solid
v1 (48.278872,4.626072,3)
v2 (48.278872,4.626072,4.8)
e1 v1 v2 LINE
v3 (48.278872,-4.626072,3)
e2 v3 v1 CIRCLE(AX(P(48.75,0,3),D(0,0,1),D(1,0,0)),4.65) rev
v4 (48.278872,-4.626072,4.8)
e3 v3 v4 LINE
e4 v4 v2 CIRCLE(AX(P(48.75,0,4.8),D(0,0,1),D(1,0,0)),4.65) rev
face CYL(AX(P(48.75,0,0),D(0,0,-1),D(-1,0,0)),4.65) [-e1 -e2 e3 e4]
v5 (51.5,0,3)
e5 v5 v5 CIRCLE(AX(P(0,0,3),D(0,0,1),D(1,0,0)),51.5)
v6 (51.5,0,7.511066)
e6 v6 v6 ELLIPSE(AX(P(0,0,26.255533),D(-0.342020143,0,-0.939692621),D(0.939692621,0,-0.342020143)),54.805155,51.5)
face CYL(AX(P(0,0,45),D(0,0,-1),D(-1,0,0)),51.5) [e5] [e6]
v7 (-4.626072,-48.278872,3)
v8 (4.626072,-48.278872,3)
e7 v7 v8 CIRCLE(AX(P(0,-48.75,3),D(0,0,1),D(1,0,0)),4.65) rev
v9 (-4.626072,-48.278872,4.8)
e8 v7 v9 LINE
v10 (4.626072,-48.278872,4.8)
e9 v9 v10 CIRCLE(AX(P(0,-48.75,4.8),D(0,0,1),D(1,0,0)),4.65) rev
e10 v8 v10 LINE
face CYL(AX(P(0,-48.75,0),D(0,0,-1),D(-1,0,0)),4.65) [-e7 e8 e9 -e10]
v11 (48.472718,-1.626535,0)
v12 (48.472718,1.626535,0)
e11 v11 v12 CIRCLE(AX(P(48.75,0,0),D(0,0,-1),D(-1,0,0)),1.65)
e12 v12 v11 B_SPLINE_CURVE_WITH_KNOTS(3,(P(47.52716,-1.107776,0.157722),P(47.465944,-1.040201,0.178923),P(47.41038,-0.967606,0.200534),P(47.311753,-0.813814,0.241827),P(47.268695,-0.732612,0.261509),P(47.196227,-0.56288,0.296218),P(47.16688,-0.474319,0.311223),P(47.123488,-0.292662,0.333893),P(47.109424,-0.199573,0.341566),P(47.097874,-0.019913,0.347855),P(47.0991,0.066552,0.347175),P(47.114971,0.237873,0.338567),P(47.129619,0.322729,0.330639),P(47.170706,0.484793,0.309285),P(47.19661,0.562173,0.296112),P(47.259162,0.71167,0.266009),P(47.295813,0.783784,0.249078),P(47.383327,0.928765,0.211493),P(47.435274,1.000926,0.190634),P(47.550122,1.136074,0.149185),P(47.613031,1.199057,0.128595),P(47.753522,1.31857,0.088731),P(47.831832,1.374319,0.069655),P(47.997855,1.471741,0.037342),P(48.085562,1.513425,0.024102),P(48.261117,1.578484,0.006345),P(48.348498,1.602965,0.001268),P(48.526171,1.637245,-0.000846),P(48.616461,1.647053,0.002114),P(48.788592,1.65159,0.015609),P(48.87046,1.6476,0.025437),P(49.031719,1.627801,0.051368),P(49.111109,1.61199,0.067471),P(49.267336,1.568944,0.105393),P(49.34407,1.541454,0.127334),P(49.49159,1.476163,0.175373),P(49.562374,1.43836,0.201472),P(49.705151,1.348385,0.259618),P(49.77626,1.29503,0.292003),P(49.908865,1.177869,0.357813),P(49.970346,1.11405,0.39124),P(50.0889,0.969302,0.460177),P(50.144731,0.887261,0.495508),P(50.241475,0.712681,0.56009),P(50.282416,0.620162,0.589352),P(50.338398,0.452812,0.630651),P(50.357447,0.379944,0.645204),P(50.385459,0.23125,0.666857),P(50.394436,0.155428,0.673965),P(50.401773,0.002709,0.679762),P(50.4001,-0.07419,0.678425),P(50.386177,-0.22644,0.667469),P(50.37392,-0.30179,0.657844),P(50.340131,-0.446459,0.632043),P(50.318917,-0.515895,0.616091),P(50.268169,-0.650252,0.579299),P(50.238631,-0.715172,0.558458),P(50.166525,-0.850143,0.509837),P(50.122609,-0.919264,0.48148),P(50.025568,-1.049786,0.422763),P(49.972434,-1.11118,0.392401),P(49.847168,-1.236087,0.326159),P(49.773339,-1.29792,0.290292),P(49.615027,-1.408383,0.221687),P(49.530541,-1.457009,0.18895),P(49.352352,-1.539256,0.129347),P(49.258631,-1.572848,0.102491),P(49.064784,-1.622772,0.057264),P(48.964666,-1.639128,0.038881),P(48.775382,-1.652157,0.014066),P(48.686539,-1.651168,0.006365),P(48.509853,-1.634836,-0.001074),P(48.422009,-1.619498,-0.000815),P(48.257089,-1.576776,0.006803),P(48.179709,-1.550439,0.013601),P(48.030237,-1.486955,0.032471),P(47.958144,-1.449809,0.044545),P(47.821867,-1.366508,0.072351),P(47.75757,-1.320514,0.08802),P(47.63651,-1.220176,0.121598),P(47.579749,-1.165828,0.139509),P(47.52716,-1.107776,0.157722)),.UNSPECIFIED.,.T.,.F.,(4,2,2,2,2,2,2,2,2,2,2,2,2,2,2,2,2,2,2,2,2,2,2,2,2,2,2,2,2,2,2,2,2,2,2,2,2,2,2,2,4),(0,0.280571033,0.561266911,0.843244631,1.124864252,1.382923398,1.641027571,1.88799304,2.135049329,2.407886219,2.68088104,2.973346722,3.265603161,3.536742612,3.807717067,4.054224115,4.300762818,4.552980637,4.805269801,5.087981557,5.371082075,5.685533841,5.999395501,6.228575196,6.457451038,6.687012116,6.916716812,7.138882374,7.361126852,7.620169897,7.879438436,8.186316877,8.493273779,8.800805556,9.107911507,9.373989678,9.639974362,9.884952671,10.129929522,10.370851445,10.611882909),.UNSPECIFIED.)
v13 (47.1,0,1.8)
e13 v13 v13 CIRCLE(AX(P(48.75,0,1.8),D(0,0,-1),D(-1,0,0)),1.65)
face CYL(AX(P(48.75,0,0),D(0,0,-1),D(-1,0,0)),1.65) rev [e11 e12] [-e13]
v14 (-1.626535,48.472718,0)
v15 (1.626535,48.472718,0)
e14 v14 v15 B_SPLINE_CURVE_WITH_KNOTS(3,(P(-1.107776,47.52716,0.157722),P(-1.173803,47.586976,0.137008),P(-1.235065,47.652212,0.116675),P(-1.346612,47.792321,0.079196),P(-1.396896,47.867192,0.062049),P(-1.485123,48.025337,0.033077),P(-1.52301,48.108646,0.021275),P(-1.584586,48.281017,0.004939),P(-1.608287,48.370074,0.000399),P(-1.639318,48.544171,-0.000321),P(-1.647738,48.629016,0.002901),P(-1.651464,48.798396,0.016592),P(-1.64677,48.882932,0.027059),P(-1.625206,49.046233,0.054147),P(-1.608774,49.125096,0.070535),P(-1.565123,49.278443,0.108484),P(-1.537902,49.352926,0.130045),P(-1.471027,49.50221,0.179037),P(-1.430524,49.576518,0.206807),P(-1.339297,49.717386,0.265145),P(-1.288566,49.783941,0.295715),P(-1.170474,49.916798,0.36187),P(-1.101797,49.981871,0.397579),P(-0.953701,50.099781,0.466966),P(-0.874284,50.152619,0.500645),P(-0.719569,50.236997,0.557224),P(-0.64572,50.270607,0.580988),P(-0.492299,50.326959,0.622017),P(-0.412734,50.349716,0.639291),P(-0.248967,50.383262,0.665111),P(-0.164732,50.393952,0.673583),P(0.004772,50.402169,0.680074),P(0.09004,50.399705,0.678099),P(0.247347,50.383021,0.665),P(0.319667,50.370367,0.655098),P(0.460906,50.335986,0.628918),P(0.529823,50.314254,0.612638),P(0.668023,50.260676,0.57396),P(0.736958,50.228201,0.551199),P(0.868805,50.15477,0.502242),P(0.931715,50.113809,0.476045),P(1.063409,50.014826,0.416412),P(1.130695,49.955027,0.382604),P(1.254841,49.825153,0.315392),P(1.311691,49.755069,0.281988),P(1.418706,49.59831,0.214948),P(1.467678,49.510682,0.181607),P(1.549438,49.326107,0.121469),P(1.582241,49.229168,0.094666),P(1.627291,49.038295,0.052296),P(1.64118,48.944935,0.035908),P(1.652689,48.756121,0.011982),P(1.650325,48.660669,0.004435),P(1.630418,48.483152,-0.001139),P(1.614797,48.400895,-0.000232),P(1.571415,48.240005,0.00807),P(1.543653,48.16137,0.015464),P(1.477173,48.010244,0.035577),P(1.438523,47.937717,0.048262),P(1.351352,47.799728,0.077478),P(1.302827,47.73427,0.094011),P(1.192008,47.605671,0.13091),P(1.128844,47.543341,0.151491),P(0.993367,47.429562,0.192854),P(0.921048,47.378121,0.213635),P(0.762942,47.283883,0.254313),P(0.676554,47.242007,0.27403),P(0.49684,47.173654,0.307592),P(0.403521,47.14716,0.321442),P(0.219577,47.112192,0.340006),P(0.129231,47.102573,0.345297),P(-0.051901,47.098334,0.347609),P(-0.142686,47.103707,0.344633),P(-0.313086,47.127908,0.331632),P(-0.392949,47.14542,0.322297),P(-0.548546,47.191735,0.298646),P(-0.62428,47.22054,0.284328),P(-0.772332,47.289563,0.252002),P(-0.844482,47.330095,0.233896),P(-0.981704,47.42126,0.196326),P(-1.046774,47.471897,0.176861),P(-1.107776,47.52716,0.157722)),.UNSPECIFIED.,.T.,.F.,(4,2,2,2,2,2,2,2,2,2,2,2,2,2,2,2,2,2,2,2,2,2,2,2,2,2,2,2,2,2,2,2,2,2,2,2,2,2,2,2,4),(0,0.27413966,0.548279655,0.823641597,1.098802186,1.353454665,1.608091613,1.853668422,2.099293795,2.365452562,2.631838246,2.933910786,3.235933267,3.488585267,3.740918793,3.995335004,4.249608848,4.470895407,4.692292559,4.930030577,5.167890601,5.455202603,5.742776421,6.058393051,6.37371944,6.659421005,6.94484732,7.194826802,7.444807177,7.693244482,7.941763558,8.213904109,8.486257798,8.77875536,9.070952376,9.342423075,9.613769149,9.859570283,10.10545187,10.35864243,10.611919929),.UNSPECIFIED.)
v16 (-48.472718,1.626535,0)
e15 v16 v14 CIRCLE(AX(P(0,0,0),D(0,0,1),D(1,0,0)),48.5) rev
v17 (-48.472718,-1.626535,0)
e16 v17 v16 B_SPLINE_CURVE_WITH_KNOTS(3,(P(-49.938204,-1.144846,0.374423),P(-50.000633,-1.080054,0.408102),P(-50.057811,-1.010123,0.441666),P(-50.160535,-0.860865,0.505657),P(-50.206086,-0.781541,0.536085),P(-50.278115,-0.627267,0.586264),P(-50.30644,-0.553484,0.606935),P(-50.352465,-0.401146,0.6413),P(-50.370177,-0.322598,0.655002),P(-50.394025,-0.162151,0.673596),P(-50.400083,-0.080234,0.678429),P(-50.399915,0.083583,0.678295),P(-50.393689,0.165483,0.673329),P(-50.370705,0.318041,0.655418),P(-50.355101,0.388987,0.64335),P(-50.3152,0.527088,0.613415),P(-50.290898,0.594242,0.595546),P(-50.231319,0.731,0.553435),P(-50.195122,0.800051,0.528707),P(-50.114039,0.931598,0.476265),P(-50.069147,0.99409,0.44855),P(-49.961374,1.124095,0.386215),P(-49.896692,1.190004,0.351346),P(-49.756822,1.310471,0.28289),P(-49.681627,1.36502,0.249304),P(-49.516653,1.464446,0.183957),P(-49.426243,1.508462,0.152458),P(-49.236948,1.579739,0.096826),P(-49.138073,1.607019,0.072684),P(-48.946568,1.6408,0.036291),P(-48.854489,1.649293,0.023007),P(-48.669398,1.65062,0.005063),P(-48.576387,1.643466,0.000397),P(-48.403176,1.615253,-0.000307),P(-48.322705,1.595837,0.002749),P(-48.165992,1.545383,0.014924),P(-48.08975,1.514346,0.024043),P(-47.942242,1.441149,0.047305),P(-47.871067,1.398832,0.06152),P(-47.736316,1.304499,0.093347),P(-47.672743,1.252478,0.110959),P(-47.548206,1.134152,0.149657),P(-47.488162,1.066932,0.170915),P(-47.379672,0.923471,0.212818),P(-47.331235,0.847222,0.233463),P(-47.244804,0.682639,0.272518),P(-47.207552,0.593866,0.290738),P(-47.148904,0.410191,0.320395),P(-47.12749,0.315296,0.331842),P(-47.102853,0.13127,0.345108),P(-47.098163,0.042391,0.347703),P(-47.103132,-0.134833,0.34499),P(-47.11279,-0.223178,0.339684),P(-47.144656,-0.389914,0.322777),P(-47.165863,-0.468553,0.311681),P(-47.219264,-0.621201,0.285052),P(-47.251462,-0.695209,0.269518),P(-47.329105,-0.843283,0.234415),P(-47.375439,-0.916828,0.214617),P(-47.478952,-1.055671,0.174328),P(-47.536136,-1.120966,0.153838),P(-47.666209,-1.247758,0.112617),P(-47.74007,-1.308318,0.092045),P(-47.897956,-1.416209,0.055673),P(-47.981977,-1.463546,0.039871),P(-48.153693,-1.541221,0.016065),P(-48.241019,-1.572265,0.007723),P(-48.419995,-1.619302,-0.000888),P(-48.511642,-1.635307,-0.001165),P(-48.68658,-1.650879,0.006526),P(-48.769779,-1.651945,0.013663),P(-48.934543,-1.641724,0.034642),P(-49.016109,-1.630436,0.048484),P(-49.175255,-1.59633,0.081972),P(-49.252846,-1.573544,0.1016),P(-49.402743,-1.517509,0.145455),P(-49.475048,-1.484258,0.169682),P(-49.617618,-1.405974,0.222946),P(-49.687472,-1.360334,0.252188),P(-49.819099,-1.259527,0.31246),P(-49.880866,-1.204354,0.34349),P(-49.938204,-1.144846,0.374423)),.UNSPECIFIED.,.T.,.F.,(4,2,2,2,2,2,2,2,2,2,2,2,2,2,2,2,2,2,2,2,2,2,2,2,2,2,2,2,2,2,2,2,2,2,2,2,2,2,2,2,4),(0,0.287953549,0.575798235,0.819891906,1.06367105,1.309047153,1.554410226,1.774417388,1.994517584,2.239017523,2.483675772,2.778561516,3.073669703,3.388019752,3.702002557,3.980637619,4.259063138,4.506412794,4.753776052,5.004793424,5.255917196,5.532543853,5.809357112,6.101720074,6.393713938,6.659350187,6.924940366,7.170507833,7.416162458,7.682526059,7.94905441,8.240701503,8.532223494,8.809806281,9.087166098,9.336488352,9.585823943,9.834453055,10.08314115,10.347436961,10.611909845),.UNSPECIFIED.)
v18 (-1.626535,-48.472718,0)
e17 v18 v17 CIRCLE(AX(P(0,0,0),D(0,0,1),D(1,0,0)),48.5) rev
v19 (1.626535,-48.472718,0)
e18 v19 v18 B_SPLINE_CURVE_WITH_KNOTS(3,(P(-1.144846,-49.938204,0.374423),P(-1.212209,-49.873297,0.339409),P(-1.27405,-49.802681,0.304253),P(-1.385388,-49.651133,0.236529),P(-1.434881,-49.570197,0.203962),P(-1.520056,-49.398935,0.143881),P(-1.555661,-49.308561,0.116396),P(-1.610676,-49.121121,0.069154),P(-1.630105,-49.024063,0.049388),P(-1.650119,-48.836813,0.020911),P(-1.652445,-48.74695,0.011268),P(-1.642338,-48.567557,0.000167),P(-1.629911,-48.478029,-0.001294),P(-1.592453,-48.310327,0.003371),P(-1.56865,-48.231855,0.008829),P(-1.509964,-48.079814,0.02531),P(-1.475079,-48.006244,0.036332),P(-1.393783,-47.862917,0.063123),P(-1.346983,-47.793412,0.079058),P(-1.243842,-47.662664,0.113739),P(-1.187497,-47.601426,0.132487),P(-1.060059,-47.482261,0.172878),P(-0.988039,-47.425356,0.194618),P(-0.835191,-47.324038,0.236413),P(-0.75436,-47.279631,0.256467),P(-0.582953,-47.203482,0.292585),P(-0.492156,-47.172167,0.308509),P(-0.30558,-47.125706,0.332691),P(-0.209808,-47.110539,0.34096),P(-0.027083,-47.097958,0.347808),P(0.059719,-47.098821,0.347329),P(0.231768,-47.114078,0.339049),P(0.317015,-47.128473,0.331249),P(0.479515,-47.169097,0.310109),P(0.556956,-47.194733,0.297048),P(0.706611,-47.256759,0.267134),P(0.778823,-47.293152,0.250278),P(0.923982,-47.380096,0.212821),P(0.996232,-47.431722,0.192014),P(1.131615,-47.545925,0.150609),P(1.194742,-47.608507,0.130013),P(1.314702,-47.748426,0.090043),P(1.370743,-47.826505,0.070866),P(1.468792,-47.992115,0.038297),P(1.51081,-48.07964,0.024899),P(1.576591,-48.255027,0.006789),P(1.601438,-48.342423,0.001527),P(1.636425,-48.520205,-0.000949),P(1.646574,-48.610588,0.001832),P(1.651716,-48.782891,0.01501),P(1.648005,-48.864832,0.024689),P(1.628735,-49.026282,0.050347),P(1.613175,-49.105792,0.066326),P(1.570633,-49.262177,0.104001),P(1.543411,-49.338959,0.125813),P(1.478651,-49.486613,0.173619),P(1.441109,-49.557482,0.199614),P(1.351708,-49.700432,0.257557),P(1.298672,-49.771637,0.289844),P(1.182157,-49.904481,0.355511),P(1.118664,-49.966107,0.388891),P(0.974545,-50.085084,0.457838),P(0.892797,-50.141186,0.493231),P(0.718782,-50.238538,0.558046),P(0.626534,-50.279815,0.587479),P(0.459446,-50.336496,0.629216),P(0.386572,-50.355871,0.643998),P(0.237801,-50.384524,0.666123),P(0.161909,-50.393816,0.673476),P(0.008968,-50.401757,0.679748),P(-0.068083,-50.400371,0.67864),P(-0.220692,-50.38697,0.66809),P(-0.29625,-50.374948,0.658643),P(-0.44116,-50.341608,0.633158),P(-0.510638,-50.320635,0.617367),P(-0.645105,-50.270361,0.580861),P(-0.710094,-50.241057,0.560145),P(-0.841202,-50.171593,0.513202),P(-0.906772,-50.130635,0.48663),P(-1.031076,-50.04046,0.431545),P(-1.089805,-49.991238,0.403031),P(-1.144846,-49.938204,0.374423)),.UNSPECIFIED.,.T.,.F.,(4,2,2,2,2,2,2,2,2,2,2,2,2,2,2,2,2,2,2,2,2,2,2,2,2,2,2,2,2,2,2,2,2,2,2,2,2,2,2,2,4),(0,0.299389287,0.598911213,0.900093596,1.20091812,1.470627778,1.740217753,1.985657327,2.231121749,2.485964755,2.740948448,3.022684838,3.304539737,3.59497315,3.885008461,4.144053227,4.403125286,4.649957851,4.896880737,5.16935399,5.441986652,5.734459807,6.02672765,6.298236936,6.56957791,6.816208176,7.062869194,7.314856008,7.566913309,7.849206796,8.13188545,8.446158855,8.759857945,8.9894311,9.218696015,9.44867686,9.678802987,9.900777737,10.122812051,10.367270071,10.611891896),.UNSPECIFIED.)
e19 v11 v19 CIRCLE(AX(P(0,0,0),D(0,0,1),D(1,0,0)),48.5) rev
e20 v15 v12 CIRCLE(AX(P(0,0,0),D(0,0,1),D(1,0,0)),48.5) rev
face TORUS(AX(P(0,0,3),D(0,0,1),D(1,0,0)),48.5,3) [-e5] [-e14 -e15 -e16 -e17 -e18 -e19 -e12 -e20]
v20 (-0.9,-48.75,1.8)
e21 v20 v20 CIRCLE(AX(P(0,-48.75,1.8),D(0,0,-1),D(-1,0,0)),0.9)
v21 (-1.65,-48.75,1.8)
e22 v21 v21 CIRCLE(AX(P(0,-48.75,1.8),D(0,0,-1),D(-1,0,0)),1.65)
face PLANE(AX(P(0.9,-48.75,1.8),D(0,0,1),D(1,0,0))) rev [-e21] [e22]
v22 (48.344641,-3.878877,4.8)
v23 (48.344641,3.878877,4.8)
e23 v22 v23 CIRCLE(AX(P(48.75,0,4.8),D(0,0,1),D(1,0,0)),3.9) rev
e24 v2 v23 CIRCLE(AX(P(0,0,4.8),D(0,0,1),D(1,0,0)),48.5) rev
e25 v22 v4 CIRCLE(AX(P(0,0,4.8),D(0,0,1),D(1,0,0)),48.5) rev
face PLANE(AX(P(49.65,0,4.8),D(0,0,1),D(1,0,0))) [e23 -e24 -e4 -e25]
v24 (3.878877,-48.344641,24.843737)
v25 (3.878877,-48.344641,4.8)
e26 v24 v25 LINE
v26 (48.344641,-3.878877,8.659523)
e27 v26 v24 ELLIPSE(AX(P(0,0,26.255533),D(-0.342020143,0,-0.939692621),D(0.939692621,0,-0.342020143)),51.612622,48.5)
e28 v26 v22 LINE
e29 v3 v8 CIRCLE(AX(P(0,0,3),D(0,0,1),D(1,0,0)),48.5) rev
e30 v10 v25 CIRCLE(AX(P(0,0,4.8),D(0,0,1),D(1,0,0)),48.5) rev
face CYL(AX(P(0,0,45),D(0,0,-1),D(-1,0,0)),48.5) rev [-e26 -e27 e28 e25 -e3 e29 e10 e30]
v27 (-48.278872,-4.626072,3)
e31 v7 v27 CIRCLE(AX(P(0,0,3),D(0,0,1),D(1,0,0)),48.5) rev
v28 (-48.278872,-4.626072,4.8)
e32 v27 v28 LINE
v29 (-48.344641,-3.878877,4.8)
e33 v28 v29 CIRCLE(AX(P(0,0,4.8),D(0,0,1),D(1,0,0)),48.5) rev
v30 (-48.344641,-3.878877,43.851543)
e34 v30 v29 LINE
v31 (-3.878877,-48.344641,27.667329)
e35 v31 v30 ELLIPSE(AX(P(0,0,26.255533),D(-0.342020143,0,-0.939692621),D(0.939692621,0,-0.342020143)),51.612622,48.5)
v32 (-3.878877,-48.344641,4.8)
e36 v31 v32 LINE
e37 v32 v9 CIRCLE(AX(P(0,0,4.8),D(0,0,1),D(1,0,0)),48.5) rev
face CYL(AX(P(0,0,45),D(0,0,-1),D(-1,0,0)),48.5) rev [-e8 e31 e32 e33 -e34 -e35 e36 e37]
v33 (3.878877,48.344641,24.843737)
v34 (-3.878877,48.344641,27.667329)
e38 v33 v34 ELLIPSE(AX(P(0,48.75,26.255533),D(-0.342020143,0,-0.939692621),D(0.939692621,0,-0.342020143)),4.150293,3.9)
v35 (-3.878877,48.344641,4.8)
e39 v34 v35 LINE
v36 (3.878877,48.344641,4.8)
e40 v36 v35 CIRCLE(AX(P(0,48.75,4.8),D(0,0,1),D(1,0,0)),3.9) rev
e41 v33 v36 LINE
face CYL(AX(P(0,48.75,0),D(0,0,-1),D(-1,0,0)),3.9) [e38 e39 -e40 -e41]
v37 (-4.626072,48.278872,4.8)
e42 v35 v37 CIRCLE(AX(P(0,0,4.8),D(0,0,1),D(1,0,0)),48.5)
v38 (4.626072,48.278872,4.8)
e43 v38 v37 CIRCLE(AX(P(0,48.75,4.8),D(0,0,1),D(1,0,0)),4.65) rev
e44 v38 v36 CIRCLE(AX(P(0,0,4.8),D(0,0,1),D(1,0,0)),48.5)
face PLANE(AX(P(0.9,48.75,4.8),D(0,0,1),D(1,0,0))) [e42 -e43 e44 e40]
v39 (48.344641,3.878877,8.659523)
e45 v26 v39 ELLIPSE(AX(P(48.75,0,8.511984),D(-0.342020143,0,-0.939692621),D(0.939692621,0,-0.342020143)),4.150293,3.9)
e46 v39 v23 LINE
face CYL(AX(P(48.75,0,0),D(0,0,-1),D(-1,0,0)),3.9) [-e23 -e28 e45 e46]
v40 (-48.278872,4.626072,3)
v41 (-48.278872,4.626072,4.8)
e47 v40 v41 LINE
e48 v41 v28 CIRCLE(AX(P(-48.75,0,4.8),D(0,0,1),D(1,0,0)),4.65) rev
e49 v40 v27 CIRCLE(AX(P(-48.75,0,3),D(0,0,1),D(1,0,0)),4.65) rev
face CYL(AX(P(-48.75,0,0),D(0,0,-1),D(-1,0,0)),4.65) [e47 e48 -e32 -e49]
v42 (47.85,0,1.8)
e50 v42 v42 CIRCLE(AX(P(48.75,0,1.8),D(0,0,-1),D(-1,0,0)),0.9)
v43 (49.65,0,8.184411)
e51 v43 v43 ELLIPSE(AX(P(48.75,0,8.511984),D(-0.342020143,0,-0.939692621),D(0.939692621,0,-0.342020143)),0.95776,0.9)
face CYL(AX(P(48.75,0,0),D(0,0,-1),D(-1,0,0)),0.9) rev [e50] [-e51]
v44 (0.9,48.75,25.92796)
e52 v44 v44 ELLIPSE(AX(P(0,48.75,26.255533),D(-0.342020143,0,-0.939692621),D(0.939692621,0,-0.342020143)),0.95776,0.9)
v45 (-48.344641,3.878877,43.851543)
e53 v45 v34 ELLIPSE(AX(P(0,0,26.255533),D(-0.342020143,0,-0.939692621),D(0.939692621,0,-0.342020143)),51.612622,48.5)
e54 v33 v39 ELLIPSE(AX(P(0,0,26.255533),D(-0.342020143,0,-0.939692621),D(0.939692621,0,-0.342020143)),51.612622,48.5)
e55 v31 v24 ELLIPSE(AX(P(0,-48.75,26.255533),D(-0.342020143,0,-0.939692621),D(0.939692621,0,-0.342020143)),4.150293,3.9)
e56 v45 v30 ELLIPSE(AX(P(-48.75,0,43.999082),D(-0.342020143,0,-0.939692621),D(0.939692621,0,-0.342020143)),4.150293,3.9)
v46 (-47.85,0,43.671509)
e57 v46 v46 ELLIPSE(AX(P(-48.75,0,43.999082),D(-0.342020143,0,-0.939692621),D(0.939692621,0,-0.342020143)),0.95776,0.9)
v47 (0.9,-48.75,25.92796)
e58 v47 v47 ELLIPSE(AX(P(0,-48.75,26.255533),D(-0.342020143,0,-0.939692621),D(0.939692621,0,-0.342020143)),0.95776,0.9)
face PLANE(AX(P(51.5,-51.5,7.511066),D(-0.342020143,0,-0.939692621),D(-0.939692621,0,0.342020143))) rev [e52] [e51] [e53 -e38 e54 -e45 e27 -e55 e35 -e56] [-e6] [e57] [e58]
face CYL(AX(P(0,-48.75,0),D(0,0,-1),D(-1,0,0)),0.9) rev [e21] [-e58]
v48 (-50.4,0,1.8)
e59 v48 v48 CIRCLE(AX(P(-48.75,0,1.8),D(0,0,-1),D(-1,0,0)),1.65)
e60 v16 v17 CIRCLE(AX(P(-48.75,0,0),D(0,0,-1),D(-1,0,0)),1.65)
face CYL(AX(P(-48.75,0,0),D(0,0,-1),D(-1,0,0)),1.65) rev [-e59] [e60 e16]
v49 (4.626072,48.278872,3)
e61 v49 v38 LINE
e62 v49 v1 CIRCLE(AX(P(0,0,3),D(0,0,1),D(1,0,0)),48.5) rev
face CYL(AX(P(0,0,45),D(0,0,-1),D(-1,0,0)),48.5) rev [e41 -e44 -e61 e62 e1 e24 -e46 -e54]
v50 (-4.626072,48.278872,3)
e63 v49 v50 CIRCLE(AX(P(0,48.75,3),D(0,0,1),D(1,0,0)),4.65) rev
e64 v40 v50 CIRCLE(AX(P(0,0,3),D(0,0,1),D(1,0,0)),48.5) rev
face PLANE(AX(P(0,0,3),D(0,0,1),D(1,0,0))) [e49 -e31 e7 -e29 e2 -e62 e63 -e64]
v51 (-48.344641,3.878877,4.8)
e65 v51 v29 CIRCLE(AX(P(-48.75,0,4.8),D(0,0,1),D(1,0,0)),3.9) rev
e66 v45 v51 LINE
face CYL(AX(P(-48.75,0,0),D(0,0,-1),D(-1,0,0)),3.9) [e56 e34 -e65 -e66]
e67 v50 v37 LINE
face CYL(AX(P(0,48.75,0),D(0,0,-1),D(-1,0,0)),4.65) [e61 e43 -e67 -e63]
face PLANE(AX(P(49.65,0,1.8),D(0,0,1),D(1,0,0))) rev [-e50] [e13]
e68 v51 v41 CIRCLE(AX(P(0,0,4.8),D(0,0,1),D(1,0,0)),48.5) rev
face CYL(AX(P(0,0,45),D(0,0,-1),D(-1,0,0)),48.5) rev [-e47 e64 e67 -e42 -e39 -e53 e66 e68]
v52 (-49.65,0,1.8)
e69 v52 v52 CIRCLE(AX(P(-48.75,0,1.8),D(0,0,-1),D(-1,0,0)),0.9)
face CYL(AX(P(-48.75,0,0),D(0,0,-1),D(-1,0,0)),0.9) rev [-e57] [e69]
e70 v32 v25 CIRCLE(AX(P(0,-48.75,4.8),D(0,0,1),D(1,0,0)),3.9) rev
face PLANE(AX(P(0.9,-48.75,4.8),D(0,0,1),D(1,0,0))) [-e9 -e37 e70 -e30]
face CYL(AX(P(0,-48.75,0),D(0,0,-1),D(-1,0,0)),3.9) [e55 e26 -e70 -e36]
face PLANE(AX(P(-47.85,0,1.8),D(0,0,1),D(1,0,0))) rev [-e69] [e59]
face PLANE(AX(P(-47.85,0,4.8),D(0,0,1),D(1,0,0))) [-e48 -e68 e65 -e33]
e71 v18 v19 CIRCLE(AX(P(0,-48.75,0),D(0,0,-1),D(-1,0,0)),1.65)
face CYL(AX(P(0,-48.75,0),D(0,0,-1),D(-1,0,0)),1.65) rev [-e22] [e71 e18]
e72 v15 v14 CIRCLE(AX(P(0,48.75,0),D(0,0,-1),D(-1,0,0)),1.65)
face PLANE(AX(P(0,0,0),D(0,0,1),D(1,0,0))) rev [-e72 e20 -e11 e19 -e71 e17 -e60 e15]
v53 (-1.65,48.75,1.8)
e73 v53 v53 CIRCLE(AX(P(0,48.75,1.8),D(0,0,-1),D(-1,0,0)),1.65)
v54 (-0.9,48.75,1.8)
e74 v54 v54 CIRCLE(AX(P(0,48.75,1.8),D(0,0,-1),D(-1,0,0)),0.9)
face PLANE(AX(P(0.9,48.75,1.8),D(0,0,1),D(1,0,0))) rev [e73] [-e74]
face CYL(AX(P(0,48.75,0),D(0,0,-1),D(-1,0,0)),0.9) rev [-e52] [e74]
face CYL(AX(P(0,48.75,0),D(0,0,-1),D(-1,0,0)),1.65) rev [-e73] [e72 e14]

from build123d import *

# Parameters (mm, degrees)
SKETCH_1_R                = 51.5
EXTRUDE_1_DEPTH           = 45
CUT_EXTRUDE_1_DEPTH       = 86.612499087
CUT_EXTRUDE_1_DEPTH_BACK  = 86.612499087
FILLET_1_R                = 3
HOLE_WIZARD_1_D           = 1.8
HOLE_WIZARD_1_CBORE_D     = 3.3
HOLE_WIZARD_1_CBORE_DEPTH = 1.8
PATTERN_CIRCULAR_1_COUNT  = 4
SHELL_START               = 3
SHELL_5_DEPTH             = 40.851543255
SHELL_START_2             = 4.8
SHELL_5_2_DEPTH           = 39.051543255


# Read off the part's stored shape, not the designer's step: 抽壳5
with BuildPart() as part:
    # 草图1 → 凸台-拉伸1 (new body)
    with BuildSketch(Plane.XY):
        with Locations(Location((0, 0, 0), (0, 0, 180))):
            Circle(SKETCH_1_R)
    extrude(amount=EXTRUDE_1_DEPTH)

    # 草图2 → 切除-拉伸1 (cut, two sides: drawn at the far end of the back side and taken through both)
    with BuildSketch(Plane(origin=(0, 0, 0), x_dir=(1, 0, 0), z_dir=(0, 1, 0)).offset(-CUT_EXTRUDE_1_DEPTH_BACK)):
        Polygon((-51.5, -45), (51.5, -45), (51.5, -7.511065871), align=None)
    extrude(amount=CUT_EXTRUDE_1_DEPTH + CUT_EXTRUDE_1_DEPTH_BACK, mode=Mode.SUBTRACT)

    # 圆角1
    fillet_1_edges = [part.edges().sort_by_distance(p)[0] for p in [
        (51.5, 0, 0),
    ]]
    fillet(fillet_1_edges, radius=FILLET_1_R)

    # 打孔尺寸(%根据)内六角圆柱头螺钉的类型1 (through all)
    with Locations(Plane(origin=(0, 0, 0), x_dir=(-1, 0, 0), z_dir=(0, 0, -1))):
        with Locations((0, 48.75)):
            hole_wizard_1 = CounterBoreHole(HOLE_WIZARD_1_D / 2, HOLE_WIZARD_1_CBORE_D / 2, HOLE_WIZARD_1_CBORE_DEPTH)

    # 阵列(圆周)1: 打孔尺寸(%根据)内六角圆柱头螺钉的类型1 ×4 about axis
    pattern_circular_1_axis = Axis((0, 0, 0), (0, 0, 1))
    for i in range(1, PATTERN_CIRCULAR_1_COUNT):
        add(hole_wizard_1.rotate(pattern_circular_1_axis, i * 360 / PATTERN_CIRCULAR_1_COUNT), mode=Mode.SUBTRACT)

    # 抽壳5 outline → 抽壳5 (cut)
    with BuildSketch(Plane.XY.offset(SHELL_START)):
        with BuildLine():
            ThreePointArc((-48.278871795, -4.626071575), (-34.294678888, -34.294678888), (-4.626071575, -48.278871795))
            ThreePointArc((-4.626071575, -48.278871795), (0, -44.1), (4.626071575, -48.278871795))
            ThreePointArc((4.626071575, -48.278871795), (34.294678888, -34.294678888), (48.278871795, -4.626071575))
            ThreePointArc((48.278871795, -4.626071575), (44.1, 0), (48.278871795, 4.626071575))
            ThreePointArc((48.278871795, 4.626071575), (34.294678888, 34.294678888), (4.626071575, 48.278871795))
            ThreePointArc((4.626071575, 48.278871795), (0, 44.1), (-4.626071575, 48.278871795))
            ThreePointArc((-4.626071575, 48.278871795), (-34.294678888, 34.294678888), (-48.278871795, 4.626071575))
            ThreePointArc((-48.278871795, 4.626071575), (-44.1, 0), (-48.278871795, -4.626071575))
        make_face()
    extrude(amount=SHELL_5_DEPTH, mode=Mode.SUBTRACT)

    # Shell 5 2 outline → Shell 5 2 (cut)
    with BuildSketch(Plane.XY.offset(SHELL_START_2)):
        with BuildLine():
            ThreePointArc((4.626071575, -48.278871795), (0, -44.1), (-4.626071575, -48.278871795))
            ThreePointArc((-4.626071575, -48.278871795), (-4.252601262, -48.313200914), (-3.878876655, -48.344641026))
            ThreePointArc((-3.878876655, -48.344641026), (0, -44.85), (3.878876655, -48.344641026))
            ThreePointArc((3.878876655, -48.344641026), (4.252601262, -48.313200914), (4.626071575, -48.278871795))
        make_face()
        with BuildLine():
            ThreePointArc((-48.344641026, -3.878876655), (-48.313200914, -4.252601262), (-48.278871795, -4.626071575))
            ThreePointArc((-48.278871795, -4.626071575), (-44.1, 0), (-48.278871795, 4.626071575))
            ThreePointArc((-48.278871795, 4.626071575), (-48.313200914, 4.252601262), (-48.344641026, 3.878876655))
            ThreePointArc((-48.344641026, 3.878876655), (-44.85, 0), (-48.344641026, -3.878876655))
        make_face()
        with BuildLine():
            ThreePointArc((48.278871795, 4.626071575), (44.1, 0), (48.278871795, -4.626071575))
            ThreePointArc((48.278871795, -4.626071575), (48.313200914, -4.252601262), (48.344641026, -3.878876655))
            ThreePointArc((48.344641026, -3.878876655), (44.85, 0), (48.344641026, 3.878876655))
            ThreePointArc((48.344641026, 3.878876655), (48.313200914, 4.252601262), (48.278871795, 4.626071575))
        make_face()
        with BuildLine():
            ThreePointArc((-3.878876655, 48.344641026), (-4.252601262, 48.313200914), (-4.626071575, 48.278871795))
            ThreePointArc((-4.626071575, 48.278871795), (0, 44.1), (4.626071575, 48.278871795))
            ThreePointArc((4.626071575, 48.278871795), (4.252601262, 48.313200914), (3.878876655, 48.344641026))
            ThreePointArc((3.878876655, 48.344641026), (0, 44.85), (-3.878876655, 48.344641026))
        make_face()
    extrude(amount=SHELL_5_2_DEPTH, mode=Mode.SUBTRACT)


solid = part.part
